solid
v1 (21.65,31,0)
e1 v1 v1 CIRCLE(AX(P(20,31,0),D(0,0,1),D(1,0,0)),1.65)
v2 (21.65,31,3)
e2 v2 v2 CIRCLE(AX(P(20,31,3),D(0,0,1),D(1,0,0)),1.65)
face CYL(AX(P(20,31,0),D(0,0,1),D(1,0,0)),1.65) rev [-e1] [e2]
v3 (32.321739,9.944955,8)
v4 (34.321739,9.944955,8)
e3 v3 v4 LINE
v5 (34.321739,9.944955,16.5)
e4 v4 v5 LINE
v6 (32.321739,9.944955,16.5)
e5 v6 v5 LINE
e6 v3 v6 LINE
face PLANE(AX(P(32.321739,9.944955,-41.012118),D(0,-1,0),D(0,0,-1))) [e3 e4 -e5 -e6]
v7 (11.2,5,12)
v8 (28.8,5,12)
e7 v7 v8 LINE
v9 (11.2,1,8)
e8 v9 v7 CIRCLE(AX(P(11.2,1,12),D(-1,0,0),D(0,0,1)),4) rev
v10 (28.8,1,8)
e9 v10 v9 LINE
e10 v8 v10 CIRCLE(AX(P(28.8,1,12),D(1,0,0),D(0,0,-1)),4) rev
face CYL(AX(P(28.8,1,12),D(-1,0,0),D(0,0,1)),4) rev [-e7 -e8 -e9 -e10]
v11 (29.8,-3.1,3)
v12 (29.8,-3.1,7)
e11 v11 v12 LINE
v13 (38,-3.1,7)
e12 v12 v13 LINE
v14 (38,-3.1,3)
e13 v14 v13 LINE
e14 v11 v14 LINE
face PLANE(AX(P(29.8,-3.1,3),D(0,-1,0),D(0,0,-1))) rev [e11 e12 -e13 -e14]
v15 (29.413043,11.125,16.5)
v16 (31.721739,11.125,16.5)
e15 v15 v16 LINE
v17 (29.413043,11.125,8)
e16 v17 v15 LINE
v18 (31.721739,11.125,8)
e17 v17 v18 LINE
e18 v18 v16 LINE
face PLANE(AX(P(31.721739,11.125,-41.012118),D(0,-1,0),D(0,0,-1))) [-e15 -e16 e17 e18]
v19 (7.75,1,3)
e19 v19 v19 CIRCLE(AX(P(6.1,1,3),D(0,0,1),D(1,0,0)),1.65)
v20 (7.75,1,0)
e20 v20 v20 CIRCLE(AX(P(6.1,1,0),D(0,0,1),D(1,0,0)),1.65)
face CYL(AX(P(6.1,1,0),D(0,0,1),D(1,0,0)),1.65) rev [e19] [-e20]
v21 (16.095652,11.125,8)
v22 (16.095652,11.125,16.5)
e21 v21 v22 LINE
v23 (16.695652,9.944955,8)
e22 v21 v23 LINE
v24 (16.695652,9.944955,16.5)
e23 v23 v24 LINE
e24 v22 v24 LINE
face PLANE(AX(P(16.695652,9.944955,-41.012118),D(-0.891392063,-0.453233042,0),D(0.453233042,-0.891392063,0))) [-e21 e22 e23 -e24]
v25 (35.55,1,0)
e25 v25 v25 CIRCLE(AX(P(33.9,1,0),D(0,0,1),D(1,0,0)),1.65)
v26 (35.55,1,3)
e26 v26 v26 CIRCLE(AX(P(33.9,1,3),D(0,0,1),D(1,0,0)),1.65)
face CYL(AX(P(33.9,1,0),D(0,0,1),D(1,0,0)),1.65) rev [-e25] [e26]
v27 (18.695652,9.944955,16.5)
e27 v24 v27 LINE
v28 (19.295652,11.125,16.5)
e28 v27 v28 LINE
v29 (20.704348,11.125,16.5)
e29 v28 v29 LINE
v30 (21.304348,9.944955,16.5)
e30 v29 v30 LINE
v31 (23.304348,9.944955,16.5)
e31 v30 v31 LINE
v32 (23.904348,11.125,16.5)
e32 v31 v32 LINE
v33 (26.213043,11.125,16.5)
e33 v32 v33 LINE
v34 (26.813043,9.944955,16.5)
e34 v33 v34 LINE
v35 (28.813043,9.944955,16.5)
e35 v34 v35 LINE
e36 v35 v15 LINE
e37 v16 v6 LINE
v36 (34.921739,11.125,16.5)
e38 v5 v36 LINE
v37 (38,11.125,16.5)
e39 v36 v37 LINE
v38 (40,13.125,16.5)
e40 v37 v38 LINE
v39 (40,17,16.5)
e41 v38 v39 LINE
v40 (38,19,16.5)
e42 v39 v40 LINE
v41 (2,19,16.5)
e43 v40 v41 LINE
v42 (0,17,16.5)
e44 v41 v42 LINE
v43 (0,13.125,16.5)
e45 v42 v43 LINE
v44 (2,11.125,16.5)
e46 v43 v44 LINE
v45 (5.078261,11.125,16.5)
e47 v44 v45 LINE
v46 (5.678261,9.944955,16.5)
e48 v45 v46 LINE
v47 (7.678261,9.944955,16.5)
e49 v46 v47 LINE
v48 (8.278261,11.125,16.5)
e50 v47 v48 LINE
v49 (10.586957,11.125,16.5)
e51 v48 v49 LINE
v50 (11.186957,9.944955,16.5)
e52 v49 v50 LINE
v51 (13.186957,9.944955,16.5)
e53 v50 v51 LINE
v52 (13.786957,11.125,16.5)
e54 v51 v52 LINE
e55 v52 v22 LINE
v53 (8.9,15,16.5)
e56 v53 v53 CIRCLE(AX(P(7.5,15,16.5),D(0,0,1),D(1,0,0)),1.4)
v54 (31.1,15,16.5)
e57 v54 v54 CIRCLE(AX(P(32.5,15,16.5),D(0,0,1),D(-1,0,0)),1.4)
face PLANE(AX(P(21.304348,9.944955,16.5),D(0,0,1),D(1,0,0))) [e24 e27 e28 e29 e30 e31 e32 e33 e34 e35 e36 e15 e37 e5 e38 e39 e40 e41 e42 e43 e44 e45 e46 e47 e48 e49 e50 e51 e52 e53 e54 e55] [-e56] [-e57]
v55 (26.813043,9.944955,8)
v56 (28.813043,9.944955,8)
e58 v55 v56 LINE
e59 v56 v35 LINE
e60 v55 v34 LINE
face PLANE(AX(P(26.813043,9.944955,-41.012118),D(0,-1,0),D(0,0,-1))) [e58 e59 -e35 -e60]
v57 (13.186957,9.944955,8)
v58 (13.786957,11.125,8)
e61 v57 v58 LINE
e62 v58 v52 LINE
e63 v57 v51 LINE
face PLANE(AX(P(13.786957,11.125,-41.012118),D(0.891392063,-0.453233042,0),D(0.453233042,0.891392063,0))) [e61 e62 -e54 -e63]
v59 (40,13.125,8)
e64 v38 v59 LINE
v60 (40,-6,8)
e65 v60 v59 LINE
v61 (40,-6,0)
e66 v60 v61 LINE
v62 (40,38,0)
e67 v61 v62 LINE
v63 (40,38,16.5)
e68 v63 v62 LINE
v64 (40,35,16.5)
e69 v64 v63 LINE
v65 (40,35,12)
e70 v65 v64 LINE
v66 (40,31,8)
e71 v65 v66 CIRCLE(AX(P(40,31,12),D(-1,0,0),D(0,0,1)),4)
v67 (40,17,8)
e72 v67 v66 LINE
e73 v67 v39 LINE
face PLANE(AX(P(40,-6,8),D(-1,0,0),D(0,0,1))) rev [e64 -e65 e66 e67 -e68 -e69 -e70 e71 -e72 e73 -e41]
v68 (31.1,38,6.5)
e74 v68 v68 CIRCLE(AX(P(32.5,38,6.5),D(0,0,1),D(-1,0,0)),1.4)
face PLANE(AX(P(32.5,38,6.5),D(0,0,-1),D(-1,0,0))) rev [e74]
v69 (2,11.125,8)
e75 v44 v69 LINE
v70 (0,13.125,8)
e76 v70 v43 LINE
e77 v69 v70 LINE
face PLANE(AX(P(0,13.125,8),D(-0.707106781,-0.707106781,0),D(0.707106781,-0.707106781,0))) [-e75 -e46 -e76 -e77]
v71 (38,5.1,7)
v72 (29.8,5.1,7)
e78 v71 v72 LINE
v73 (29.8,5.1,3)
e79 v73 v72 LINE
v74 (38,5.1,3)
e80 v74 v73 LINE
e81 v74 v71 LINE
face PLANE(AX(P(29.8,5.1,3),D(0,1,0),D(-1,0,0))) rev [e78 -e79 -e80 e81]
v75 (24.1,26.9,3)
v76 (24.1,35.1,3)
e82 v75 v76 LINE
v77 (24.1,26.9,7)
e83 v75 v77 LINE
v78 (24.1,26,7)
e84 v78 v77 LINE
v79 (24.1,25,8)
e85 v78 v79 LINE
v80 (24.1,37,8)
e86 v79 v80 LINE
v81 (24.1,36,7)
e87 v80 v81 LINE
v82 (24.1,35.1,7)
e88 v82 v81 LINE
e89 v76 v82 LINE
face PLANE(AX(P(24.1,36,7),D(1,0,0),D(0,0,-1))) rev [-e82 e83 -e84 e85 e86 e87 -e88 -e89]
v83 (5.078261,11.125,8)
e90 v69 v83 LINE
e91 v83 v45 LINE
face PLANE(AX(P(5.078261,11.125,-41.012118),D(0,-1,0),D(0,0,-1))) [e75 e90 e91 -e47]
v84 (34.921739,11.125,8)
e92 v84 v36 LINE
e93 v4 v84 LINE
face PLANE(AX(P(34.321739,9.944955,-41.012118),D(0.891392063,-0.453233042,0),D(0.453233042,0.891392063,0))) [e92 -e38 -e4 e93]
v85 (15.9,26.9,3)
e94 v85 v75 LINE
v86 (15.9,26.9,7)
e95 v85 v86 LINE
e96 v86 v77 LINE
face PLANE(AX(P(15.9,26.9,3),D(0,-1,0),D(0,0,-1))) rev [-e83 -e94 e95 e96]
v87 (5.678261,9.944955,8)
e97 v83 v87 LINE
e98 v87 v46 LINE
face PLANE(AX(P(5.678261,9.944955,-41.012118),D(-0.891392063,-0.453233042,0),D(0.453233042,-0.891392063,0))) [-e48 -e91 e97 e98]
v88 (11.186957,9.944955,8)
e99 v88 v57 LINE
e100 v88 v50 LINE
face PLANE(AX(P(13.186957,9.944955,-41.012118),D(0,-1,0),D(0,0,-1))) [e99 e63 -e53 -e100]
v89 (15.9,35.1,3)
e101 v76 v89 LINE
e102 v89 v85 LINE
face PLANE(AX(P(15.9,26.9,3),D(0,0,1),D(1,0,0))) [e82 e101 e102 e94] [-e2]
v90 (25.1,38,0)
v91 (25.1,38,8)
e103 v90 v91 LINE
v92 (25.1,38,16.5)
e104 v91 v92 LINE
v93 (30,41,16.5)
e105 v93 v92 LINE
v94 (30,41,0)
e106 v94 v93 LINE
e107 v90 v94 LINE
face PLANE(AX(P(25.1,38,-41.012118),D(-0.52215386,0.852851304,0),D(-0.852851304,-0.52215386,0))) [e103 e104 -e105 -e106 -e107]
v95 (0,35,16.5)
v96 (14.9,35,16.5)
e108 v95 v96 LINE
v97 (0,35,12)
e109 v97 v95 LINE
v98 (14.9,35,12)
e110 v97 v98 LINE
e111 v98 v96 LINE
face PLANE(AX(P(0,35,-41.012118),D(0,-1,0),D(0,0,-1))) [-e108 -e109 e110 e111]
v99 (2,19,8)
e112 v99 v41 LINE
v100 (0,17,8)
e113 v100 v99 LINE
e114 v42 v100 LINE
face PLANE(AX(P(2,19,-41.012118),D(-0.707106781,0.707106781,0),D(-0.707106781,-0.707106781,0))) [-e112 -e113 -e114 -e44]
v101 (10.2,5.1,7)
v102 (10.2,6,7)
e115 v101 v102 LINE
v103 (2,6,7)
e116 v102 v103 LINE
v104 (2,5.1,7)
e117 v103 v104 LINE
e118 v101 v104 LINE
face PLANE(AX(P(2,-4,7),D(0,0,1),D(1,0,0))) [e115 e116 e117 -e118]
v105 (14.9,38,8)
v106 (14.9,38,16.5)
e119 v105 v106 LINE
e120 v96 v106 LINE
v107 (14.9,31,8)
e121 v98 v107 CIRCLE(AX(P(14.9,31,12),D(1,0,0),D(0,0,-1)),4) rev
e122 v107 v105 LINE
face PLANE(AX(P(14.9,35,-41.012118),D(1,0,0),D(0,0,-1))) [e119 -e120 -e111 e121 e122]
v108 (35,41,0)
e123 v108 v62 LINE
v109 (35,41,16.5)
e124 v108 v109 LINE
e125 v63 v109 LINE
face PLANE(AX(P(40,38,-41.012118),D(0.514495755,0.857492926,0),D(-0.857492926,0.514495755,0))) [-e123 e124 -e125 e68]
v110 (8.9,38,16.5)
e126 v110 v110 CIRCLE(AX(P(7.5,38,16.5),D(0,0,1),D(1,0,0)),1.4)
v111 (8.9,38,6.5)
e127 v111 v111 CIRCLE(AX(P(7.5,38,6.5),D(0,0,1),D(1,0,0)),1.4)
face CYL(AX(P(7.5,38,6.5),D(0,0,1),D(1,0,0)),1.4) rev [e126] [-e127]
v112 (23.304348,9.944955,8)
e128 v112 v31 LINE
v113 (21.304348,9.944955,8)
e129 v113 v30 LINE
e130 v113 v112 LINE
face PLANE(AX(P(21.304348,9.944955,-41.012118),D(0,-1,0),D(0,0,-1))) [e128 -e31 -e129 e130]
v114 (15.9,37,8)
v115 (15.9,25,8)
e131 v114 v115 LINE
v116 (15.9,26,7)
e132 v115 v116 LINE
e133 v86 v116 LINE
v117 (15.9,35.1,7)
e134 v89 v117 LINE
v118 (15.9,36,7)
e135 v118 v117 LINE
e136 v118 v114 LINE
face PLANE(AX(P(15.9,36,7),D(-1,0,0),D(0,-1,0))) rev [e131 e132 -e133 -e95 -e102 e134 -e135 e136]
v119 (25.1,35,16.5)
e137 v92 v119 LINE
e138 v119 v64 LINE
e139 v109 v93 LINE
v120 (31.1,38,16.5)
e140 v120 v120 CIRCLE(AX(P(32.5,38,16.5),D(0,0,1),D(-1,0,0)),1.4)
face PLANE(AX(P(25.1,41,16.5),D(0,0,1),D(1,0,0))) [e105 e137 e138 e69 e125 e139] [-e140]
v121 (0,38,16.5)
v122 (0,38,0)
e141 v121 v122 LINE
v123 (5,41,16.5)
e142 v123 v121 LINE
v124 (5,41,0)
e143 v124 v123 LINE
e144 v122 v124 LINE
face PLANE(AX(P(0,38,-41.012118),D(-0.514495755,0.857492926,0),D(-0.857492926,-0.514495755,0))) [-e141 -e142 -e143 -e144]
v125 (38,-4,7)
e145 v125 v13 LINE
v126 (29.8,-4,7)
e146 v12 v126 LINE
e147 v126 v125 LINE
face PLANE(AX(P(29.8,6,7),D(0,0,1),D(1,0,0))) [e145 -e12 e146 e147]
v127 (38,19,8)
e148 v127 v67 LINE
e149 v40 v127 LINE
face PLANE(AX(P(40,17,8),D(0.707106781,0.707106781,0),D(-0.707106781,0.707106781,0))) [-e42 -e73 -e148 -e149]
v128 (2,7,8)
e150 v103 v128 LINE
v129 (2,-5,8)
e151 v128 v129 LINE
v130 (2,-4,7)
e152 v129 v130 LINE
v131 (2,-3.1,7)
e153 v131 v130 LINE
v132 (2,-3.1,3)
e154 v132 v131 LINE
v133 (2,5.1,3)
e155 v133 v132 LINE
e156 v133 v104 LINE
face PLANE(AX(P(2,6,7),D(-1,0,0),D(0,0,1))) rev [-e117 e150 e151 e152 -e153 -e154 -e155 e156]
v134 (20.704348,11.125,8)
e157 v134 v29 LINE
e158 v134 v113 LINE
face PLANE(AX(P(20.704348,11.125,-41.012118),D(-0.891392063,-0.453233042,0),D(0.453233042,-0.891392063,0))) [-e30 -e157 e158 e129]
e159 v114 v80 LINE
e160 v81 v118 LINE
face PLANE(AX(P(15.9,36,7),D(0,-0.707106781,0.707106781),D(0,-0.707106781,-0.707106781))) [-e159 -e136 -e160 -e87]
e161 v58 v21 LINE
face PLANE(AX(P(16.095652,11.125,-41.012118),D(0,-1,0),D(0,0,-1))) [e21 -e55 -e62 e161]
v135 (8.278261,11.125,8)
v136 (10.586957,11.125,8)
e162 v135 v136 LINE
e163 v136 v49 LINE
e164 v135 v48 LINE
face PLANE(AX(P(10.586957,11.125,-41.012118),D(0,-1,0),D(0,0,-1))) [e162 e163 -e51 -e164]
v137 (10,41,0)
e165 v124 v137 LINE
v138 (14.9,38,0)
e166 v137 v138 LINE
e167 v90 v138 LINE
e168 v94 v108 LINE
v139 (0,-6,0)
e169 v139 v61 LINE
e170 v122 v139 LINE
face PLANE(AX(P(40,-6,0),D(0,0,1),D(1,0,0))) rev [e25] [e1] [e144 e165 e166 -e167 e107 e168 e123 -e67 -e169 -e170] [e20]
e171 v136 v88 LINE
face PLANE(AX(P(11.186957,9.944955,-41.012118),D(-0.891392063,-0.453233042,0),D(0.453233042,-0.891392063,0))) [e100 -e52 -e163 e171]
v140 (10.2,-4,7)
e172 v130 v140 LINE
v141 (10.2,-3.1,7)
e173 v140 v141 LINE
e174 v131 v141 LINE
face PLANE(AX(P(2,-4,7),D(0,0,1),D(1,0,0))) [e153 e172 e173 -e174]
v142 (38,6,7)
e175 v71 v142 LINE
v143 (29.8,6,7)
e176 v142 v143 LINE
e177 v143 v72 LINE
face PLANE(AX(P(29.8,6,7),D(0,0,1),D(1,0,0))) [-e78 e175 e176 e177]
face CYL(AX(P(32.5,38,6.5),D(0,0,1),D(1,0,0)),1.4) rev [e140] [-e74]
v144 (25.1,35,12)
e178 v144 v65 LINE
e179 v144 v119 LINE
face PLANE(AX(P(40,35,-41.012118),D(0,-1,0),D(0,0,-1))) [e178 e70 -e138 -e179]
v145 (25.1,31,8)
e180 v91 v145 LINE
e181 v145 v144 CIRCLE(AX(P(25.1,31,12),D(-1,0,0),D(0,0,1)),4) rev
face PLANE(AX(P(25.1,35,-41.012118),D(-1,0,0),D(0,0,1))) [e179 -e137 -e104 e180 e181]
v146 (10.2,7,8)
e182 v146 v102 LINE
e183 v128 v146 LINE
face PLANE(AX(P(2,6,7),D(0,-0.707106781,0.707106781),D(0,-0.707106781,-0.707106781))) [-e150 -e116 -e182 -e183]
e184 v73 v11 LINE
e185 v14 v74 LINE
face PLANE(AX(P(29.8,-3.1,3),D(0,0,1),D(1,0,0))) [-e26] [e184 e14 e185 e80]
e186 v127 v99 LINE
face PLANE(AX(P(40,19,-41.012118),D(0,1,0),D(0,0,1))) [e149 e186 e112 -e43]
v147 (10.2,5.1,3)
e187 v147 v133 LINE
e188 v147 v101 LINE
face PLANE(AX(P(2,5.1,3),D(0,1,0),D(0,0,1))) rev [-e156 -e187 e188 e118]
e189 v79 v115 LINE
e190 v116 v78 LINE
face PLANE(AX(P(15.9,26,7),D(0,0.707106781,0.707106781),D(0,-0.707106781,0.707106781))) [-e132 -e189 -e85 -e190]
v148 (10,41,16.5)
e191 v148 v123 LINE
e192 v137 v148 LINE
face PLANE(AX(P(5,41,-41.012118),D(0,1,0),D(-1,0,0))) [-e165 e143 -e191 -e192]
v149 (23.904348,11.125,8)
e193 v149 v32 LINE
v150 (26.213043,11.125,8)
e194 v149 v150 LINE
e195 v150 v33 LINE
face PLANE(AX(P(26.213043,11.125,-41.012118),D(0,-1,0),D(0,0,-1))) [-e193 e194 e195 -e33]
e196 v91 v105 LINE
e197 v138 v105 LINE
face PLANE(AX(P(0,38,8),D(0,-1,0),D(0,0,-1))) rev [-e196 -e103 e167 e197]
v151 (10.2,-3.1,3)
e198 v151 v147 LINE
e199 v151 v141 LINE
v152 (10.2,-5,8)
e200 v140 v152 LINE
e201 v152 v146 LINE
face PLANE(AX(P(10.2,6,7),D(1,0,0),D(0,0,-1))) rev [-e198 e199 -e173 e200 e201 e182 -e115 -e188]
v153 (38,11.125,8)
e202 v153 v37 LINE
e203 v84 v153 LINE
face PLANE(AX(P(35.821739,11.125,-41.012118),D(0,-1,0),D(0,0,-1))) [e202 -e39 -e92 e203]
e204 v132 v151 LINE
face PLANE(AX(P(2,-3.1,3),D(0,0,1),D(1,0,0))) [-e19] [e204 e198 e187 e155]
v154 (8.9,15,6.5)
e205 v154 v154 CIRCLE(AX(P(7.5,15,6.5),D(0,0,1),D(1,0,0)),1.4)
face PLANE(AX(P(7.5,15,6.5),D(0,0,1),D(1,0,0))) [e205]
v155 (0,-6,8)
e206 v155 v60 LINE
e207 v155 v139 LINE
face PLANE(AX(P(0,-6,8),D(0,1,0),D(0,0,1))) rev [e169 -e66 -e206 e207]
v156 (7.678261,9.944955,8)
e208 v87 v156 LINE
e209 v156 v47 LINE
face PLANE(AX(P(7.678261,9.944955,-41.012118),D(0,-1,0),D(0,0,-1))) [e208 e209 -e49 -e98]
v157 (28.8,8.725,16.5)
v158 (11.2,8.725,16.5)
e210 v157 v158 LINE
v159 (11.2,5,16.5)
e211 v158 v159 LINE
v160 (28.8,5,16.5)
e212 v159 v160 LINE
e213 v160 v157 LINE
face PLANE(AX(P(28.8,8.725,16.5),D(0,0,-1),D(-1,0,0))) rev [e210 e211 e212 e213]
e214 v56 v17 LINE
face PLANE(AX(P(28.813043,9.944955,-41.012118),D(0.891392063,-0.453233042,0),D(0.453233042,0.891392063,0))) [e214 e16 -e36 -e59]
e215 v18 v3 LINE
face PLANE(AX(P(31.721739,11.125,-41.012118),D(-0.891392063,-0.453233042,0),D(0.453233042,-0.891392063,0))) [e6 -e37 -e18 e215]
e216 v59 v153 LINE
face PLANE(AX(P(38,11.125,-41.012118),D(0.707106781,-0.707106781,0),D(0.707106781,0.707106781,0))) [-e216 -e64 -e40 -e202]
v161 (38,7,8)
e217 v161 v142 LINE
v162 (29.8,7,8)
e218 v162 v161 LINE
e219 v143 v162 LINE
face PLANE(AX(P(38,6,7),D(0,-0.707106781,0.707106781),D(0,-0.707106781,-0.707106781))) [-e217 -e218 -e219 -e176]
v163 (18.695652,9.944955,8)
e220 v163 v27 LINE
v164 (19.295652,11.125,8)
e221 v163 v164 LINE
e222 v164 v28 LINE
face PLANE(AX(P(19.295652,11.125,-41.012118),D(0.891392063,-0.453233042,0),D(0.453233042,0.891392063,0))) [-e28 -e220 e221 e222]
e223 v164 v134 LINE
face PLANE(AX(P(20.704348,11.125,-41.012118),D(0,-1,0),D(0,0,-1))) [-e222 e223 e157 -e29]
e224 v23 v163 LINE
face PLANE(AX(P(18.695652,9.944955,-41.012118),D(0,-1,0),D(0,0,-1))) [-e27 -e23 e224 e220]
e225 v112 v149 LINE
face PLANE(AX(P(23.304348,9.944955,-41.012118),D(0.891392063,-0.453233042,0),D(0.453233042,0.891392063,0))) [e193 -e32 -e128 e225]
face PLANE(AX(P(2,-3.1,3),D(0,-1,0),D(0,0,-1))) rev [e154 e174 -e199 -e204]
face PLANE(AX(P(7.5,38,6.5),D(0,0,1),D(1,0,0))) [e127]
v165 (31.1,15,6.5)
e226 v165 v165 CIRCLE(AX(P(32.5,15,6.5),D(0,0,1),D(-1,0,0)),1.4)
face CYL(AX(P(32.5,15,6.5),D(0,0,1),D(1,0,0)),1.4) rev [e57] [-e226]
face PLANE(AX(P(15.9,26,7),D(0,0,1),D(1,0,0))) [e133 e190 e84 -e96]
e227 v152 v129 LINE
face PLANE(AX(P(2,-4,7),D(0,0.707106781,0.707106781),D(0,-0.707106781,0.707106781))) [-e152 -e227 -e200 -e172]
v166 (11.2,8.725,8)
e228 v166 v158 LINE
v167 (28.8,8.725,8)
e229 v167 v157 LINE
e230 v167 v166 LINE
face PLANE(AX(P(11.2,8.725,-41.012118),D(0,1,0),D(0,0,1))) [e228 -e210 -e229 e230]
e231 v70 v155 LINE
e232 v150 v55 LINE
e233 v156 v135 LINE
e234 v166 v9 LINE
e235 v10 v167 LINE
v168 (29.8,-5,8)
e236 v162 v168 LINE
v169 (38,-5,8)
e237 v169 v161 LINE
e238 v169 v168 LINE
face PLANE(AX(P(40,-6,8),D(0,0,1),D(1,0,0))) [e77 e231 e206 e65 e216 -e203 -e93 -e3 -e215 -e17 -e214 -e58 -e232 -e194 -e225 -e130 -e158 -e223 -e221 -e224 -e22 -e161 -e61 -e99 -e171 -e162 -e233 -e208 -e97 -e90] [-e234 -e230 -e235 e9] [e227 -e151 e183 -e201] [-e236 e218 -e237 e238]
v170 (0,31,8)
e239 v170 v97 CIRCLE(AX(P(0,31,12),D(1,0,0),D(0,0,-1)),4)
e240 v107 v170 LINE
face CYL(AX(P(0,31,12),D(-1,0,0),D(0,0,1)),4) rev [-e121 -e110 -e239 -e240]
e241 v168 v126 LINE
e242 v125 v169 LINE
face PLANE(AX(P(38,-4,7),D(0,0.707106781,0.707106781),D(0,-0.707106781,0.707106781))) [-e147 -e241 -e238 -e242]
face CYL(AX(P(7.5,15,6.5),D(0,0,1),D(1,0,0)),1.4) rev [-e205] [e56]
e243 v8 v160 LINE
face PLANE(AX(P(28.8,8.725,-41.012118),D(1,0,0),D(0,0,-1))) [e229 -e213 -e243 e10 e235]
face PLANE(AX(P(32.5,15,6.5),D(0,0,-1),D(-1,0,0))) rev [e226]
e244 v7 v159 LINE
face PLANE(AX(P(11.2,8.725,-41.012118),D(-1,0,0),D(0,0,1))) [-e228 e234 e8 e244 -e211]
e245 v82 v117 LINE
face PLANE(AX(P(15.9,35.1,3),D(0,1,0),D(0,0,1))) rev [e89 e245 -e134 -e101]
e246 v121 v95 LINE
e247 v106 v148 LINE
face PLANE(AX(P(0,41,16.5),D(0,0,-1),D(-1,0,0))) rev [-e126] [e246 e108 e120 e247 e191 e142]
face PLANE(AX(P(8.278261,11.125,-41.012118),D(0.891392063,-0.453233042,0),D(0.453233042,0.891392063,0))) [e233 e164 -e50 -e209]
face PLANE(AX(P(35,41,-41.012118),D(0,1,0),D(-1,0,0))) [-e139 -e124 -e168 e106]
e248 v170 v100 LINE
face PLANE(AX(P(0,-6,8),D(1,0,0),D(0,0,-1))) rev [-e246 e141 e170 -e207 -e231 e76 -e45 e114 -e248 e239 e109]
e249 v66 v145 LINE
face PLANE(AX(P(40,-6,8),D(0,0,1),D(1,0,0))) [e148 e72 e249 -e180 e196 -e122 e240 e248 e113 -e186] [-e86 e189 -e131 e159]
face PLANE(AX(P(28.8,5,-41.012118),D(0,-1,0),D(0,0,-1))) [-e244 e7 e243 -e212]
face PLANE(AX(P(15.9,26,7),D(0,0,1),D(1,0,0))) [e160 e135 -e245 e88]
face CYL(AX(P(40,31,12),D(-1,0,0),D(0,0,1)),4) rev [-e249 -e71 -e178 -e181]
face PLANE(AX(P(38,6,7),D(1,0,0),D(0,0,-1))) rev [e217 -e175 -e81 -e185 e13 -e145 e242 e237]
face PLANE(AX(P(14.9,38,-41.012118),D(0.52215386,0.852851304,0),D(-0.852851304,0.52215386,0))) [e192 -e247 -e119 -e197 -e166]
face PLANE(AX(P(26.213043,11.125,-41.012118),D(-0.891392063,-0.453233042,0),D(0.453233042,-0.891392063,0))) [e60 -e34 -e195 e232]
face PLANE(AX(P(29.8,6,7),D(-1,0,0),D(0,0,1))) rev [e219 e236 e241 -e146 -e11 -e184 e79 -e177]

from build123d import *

# Parameters (mm, degrees)
SKETCH1_W                       = 40
SKETCH1_H                       = 44
BOSS_EXTRUDE1_DEPTH             = 8
SKETCH2_W                       = 8.2
SKETCH2_H                       = 10
CUT_EXTRUDE1_DEPTH              = 1
SKETCH3_W                       = 8.2
SKETCH3_H                       = 8.2
CUT_EXTRUDE2_DEPTH              = 4
CHAMFER1_SIZE                   = 1
SKETCH4_R                       = 1.65
CUT_EXTRUDE3_DEPTH              = 56.398555938
SKETCH5_W                       = 17.6
SKETCH5_H                       = 3.725
BOSS_EXTRUDE2_DEPTH             = 8.5
BOSS_EXTRUDE2_DIRECTION_2_REACH = 57.749
FILLET1_R                       = 4
SKETCH6_R                       = 1.4
CUT_EXTRUDE4_DEPTH              = 10
CHAMFER2_SIZE                   = 2


with BuildPart() as part:
    # Sketch1 → Boss-Extrude1 (new body)
    with BuildSketch(Plane.XY):
        with Locations((20, 16)):
            Rectangle(SKETCH1_W, SKETCH1_H)
    extrude(amount=BOSS_EXTRUDE1_DEPTH)

    # Sketch2 → Cut-Extrude1 (cut)
    with BuildSketch(Plane.XY.offset(8)):
        with Locations((20, 31)):
            Rectangle(SKETCH2_W, SKETCH2_H)
        with Locations((6.1, 1)):
            Rectangle(SKETCH2_W, SKETCH2_H)
        with Locations((33.9, 1)):
            Rectangle(SKETCH2_W, SKETCH2_H)
    extrude(amount=-CUT_EXTRUDE1_DEPTH, mode=Mode.SUBTRACT)

    # Sketch3 → Cut-Extrude2 (cut)
    with BuildSketch(Plane.XY.offset(7)):
        with Locations((20, 31)):
            Rectangle(SKETCH3_W, SKETCH3_H)
        with Locations((6.1, 1)):
            Rectangle(SKETCH3_W, SKETCH3_H)
        with Locations((33.9, 1)):
            Rectangle(SKETCH3_W, SKETCH3_H)
    extrude(amount=-CUT_EXTRUDE2_DEPTH, mode=Mode.SUBTRACT)

    # Chamfer1
    chamfer1_edges = [part.edges().sort_by_distance(p)[0] for p in [
        (20, 26, 8),
        (20, 36, 8),
        (33.9, -4, 8),
        (33.9, 6, 8),
        (6.1, -4, 8),
        (6.1, 6, 8),
    ]]
    chamfer(chamfer1_edges, length=CHAMFER1_SIZE - 0.0001)  # a hair under: the kernel refuses the full size

    # Sketch4 → Cut-Extrude3 (cut, through all)
    with BuildSketch(Plane.XY.offset(3)):
        with Locations((20, 31)):
            Circle(SKETCH4_R)
        with Locations((6.1, 1)):
            Circle(SKETCH4_R)
        with Locations((33.9, 1)):
            Circle(SKETCH4_R)
    extrude(amount=-CUT_EXTRUDE3_DEPTH, mode=Mode.SUBTRACT)

    # Sketch5 → Boss-Extrude2 (add)
    with BuildSketch(Plane.XY.offset(8)):
        Polygon((20.704347826, 11.125), (19.295652174, 11.125), (18.695652174, 9.944955324), (16.695652174, 9.944955324), (16.095652174, 11.125), (15.195652174, 11.125), (13.786956522, 11.125), (13.186956522, 9.944955324), (11.186956522, 9.944955324), (10.586956522, 11.125), (9.686956522, 11.125), (8.27826087, 11.125), (7.67826087, 9.944955324), (5.67826087, 9.944955324), (5.07826087, 11.125), (4.17826087, 11.125), (0, 11.125), (0, 19), (40, 19), (40, 11.125), (35.82173913, 11.125), (34.92173913, 11.125), (34.32173913, 9.944955324), (32.32173913, 9.944955324), (31.72173913, 11.125), (30.313043478, 11.125), (29.413043478, 11.125), (28.813043478, 9.944955324), (26.813043478, 9.944955324), (26.213043478, 11.125), (24.804347826, 11.125), (23.904347826, 11.125), (23.304347826, 9.944955324), (21.304347826, 9.944955324), align=None)
        with Locations((20, 6.8625)):
            Rectangle(SKETCH5_W, SKETCH5_H)
        Polygon((0, 35), (14.9, 35), (14.9, 38), (10, 41), (5, 41), (0, 38), align=None)
        Polygon((25.1, 38), (30, 41), (35, 41), (40, 38), (40, 35), (25.1, 35), align=None)
    extrude(amount=BOSS_EXTRUDE2_DEPTH)

    # Boss-Extrude2 direction 2: up to this face of the body (flat: up to its plane)
    boss_extrude2_direction_2_end = Plane(part.part.faces().sort_by_distance((20, 16.073973219, 0))[0])
    # Sketch5 → Boss-Extrude2 direction 2 (add, up to the picked face)
    with BuildSketch(Plane.XY.offset(8), mode=Mode.PRIVATE) as boss_extrude2_direction_2_sk1:
        Polygon((20.704347826, 11.125), (19.295652174, 11.125), (18.695652174, 9.944955324), (16.695652174, 9.944955324), (16.095652174, 11.125), (15.195652174, 11.125), (13.786956522, 11.125), (13.186956522, 9.944955324), (11.186956522, 9.944955324), (10.586956522, 11.125), (9.686956522, 11.125), (8.27826087, 11.125), (7.67826087, 9.944955324), (5.67826087, 9.944955324), (5.07826087, 11.125), (4.17826087, 11.125), (0, 11.125), (0, 19), (40, 19), (40, 11.125), (35.82173913, 11.125), (34.92173913, 11.125), (34.32173913, 9.944955324), (32.32173913, 9.944955324), (31.72173913, 11.125), (30.313043478, 11.125), (29.413043478, 11.125), (28.813043478, 9.944955324), (26.813043478, 9.944955324), (26.213043478, 11.125), (24.804347826, 11.125), (23.904347826, 11.125), (23.304347826, 9.944955324), (21.304347826, 9.944955324), align=None)
    boss_extrude2_direction_2_tool1 = split(extrude(boss_extrude2_direction_2_sk1.sketch, amount=-BOSS_EXTRUDE2_DIRECTION_2_REACH, mode=Mode.PRIVATE), bisect_by=boss_extrude2_direction_2_end, keep=Keep.BOTH, mode=Mode.PRIVATE)
    # Sketch5 → Boss-Extrude2 direction 2 (add, up to the picked face)
    with BuildSketch(Plane.XY.offset(8), mode=Mode.PRIVATE) as boss_extrude2_direction_2_sk2:
        with Locations((20, 6.8625)):
            Rectangle(SKETCH5_W, SKETCH5_H)
    boss_extrude2_direction_2_tool2 = split(extrude(boss_extrude2_direction_2_sk2.sketch, amount=-BOSS_EXTRUDE2_DIRECTION_2_REACH, mode=Mode.PRIVATE), bisect_by=boss_extrude2_direction_2_end, keep=Keep.BOTH, mode=Mode.PRIVATE)
    # Sketch5 → Boss-Extrude2 direction 2 (add, up to the picked face)
    with BuildSketch(Plane.XY.offset(8), mode=Mode.PRIVATE) as boss_extrude2_direction_2_sk3:
        Polygon((0, 35), (14.9, 35), (14.9, 38), (10, 41), (5, 41), (0, 38), align=None)
    boss_extrude2_direction_2_tool3 = split(extrude(boss_extrude2_direction_2_sk3.sketch, amount=-BOSS_EXTRUDE2_DIRECTION_2_REACH, mode=Mode.PRIVATE), bisect_by=boss_extrude2_direction_2_end, keep=Keep.BOTH, mode=Mode.PRIVATE)
    # Sketch5 → Boss-Extrude2 direction 2 (add, up to the picked face)
    with BuildSketch(Plane.XY.offset(8), mode=Mode.PRIVATE) as boss_extrude2_direction_2_sk4:
        Polygon((25.1, 38), (30, 41), (35, 41), (40, 38), (40, 35), (25.1, 35), align=None)
    boss_extrude2_direction_2_tool4 = split(extrude(boss_extrude2_direction_2_sk4.sketch, amount=-BOSS_EXTRUDE2_DIRECTION_2_REACH, mode=Mode.PRIVATE), bisect_by=boss_extrude2_direction_2_end, keep=Keep.BOTH, mode=Mode.PRIVATE)
    add(boss_extrude2_direction_2_tool1.solids().sort_by(Axis((20, 14.815025, 8), (0, 0, -1)))[0])
    add(boss_extrude2_direction_2_tool2.solids().sort_by(Axis((20, 6.8625, 8), (0, 0, -1)))[0])
    add(boss_extrude2_direction_2_tool3.solids().sort_by(Axis((7.45835, 37.60161, 8), (0, 0, -1)))[0])
    add(boss_extrude2_direction_2_tool4.solids().sort_by(Axis((32.54165, 37.60161, 8), (0, 0, -1)))[0])

    # Fillet1
    fillet1_edges = [part.edges().sort_by_distance(p)[0] for p in [
        (20, 5, 8),
        (7.45, 35, 8),
        (32.55, 35, 8),
    ]]
    fillet(fillet1_edges, radius=FILLET1_R)

    # Sketch6 → Cut-Extrude4 (cut)
    with BuildSketch(Plane.XY.offset(16.5)):
        with Locations((7.5, 38)):
            Circle(SKETCH6_R)
        with Locations((7.5, 15)):
            Circle(SKETCH6_R)
        with Locations(Location((32.5, 38, 0), (0, 0, 180))):
            Circle(SKETCH6_R)
        with Locations(Location((32.5, 15, 0), (0, 0, 180))):
            Circle(SKETCH6_R)
    extrude(amount=-CUT_EXTRUDE4_DEPTH, mode=Mode.SUBTRACT)

    # Chamfer2
    chamfer2_edges = [part.edges().sort_by_distance(p)[0] for p in [
        (0, 11.125, 12.25),
        (0, 19, 12.25),
        (40, 19, 12.25),
        (40, 11.125, 12.25),
    ]]
    chamfer(chamfer2_edges, length=CHAMFER2_SIZE)


solid = part.part
